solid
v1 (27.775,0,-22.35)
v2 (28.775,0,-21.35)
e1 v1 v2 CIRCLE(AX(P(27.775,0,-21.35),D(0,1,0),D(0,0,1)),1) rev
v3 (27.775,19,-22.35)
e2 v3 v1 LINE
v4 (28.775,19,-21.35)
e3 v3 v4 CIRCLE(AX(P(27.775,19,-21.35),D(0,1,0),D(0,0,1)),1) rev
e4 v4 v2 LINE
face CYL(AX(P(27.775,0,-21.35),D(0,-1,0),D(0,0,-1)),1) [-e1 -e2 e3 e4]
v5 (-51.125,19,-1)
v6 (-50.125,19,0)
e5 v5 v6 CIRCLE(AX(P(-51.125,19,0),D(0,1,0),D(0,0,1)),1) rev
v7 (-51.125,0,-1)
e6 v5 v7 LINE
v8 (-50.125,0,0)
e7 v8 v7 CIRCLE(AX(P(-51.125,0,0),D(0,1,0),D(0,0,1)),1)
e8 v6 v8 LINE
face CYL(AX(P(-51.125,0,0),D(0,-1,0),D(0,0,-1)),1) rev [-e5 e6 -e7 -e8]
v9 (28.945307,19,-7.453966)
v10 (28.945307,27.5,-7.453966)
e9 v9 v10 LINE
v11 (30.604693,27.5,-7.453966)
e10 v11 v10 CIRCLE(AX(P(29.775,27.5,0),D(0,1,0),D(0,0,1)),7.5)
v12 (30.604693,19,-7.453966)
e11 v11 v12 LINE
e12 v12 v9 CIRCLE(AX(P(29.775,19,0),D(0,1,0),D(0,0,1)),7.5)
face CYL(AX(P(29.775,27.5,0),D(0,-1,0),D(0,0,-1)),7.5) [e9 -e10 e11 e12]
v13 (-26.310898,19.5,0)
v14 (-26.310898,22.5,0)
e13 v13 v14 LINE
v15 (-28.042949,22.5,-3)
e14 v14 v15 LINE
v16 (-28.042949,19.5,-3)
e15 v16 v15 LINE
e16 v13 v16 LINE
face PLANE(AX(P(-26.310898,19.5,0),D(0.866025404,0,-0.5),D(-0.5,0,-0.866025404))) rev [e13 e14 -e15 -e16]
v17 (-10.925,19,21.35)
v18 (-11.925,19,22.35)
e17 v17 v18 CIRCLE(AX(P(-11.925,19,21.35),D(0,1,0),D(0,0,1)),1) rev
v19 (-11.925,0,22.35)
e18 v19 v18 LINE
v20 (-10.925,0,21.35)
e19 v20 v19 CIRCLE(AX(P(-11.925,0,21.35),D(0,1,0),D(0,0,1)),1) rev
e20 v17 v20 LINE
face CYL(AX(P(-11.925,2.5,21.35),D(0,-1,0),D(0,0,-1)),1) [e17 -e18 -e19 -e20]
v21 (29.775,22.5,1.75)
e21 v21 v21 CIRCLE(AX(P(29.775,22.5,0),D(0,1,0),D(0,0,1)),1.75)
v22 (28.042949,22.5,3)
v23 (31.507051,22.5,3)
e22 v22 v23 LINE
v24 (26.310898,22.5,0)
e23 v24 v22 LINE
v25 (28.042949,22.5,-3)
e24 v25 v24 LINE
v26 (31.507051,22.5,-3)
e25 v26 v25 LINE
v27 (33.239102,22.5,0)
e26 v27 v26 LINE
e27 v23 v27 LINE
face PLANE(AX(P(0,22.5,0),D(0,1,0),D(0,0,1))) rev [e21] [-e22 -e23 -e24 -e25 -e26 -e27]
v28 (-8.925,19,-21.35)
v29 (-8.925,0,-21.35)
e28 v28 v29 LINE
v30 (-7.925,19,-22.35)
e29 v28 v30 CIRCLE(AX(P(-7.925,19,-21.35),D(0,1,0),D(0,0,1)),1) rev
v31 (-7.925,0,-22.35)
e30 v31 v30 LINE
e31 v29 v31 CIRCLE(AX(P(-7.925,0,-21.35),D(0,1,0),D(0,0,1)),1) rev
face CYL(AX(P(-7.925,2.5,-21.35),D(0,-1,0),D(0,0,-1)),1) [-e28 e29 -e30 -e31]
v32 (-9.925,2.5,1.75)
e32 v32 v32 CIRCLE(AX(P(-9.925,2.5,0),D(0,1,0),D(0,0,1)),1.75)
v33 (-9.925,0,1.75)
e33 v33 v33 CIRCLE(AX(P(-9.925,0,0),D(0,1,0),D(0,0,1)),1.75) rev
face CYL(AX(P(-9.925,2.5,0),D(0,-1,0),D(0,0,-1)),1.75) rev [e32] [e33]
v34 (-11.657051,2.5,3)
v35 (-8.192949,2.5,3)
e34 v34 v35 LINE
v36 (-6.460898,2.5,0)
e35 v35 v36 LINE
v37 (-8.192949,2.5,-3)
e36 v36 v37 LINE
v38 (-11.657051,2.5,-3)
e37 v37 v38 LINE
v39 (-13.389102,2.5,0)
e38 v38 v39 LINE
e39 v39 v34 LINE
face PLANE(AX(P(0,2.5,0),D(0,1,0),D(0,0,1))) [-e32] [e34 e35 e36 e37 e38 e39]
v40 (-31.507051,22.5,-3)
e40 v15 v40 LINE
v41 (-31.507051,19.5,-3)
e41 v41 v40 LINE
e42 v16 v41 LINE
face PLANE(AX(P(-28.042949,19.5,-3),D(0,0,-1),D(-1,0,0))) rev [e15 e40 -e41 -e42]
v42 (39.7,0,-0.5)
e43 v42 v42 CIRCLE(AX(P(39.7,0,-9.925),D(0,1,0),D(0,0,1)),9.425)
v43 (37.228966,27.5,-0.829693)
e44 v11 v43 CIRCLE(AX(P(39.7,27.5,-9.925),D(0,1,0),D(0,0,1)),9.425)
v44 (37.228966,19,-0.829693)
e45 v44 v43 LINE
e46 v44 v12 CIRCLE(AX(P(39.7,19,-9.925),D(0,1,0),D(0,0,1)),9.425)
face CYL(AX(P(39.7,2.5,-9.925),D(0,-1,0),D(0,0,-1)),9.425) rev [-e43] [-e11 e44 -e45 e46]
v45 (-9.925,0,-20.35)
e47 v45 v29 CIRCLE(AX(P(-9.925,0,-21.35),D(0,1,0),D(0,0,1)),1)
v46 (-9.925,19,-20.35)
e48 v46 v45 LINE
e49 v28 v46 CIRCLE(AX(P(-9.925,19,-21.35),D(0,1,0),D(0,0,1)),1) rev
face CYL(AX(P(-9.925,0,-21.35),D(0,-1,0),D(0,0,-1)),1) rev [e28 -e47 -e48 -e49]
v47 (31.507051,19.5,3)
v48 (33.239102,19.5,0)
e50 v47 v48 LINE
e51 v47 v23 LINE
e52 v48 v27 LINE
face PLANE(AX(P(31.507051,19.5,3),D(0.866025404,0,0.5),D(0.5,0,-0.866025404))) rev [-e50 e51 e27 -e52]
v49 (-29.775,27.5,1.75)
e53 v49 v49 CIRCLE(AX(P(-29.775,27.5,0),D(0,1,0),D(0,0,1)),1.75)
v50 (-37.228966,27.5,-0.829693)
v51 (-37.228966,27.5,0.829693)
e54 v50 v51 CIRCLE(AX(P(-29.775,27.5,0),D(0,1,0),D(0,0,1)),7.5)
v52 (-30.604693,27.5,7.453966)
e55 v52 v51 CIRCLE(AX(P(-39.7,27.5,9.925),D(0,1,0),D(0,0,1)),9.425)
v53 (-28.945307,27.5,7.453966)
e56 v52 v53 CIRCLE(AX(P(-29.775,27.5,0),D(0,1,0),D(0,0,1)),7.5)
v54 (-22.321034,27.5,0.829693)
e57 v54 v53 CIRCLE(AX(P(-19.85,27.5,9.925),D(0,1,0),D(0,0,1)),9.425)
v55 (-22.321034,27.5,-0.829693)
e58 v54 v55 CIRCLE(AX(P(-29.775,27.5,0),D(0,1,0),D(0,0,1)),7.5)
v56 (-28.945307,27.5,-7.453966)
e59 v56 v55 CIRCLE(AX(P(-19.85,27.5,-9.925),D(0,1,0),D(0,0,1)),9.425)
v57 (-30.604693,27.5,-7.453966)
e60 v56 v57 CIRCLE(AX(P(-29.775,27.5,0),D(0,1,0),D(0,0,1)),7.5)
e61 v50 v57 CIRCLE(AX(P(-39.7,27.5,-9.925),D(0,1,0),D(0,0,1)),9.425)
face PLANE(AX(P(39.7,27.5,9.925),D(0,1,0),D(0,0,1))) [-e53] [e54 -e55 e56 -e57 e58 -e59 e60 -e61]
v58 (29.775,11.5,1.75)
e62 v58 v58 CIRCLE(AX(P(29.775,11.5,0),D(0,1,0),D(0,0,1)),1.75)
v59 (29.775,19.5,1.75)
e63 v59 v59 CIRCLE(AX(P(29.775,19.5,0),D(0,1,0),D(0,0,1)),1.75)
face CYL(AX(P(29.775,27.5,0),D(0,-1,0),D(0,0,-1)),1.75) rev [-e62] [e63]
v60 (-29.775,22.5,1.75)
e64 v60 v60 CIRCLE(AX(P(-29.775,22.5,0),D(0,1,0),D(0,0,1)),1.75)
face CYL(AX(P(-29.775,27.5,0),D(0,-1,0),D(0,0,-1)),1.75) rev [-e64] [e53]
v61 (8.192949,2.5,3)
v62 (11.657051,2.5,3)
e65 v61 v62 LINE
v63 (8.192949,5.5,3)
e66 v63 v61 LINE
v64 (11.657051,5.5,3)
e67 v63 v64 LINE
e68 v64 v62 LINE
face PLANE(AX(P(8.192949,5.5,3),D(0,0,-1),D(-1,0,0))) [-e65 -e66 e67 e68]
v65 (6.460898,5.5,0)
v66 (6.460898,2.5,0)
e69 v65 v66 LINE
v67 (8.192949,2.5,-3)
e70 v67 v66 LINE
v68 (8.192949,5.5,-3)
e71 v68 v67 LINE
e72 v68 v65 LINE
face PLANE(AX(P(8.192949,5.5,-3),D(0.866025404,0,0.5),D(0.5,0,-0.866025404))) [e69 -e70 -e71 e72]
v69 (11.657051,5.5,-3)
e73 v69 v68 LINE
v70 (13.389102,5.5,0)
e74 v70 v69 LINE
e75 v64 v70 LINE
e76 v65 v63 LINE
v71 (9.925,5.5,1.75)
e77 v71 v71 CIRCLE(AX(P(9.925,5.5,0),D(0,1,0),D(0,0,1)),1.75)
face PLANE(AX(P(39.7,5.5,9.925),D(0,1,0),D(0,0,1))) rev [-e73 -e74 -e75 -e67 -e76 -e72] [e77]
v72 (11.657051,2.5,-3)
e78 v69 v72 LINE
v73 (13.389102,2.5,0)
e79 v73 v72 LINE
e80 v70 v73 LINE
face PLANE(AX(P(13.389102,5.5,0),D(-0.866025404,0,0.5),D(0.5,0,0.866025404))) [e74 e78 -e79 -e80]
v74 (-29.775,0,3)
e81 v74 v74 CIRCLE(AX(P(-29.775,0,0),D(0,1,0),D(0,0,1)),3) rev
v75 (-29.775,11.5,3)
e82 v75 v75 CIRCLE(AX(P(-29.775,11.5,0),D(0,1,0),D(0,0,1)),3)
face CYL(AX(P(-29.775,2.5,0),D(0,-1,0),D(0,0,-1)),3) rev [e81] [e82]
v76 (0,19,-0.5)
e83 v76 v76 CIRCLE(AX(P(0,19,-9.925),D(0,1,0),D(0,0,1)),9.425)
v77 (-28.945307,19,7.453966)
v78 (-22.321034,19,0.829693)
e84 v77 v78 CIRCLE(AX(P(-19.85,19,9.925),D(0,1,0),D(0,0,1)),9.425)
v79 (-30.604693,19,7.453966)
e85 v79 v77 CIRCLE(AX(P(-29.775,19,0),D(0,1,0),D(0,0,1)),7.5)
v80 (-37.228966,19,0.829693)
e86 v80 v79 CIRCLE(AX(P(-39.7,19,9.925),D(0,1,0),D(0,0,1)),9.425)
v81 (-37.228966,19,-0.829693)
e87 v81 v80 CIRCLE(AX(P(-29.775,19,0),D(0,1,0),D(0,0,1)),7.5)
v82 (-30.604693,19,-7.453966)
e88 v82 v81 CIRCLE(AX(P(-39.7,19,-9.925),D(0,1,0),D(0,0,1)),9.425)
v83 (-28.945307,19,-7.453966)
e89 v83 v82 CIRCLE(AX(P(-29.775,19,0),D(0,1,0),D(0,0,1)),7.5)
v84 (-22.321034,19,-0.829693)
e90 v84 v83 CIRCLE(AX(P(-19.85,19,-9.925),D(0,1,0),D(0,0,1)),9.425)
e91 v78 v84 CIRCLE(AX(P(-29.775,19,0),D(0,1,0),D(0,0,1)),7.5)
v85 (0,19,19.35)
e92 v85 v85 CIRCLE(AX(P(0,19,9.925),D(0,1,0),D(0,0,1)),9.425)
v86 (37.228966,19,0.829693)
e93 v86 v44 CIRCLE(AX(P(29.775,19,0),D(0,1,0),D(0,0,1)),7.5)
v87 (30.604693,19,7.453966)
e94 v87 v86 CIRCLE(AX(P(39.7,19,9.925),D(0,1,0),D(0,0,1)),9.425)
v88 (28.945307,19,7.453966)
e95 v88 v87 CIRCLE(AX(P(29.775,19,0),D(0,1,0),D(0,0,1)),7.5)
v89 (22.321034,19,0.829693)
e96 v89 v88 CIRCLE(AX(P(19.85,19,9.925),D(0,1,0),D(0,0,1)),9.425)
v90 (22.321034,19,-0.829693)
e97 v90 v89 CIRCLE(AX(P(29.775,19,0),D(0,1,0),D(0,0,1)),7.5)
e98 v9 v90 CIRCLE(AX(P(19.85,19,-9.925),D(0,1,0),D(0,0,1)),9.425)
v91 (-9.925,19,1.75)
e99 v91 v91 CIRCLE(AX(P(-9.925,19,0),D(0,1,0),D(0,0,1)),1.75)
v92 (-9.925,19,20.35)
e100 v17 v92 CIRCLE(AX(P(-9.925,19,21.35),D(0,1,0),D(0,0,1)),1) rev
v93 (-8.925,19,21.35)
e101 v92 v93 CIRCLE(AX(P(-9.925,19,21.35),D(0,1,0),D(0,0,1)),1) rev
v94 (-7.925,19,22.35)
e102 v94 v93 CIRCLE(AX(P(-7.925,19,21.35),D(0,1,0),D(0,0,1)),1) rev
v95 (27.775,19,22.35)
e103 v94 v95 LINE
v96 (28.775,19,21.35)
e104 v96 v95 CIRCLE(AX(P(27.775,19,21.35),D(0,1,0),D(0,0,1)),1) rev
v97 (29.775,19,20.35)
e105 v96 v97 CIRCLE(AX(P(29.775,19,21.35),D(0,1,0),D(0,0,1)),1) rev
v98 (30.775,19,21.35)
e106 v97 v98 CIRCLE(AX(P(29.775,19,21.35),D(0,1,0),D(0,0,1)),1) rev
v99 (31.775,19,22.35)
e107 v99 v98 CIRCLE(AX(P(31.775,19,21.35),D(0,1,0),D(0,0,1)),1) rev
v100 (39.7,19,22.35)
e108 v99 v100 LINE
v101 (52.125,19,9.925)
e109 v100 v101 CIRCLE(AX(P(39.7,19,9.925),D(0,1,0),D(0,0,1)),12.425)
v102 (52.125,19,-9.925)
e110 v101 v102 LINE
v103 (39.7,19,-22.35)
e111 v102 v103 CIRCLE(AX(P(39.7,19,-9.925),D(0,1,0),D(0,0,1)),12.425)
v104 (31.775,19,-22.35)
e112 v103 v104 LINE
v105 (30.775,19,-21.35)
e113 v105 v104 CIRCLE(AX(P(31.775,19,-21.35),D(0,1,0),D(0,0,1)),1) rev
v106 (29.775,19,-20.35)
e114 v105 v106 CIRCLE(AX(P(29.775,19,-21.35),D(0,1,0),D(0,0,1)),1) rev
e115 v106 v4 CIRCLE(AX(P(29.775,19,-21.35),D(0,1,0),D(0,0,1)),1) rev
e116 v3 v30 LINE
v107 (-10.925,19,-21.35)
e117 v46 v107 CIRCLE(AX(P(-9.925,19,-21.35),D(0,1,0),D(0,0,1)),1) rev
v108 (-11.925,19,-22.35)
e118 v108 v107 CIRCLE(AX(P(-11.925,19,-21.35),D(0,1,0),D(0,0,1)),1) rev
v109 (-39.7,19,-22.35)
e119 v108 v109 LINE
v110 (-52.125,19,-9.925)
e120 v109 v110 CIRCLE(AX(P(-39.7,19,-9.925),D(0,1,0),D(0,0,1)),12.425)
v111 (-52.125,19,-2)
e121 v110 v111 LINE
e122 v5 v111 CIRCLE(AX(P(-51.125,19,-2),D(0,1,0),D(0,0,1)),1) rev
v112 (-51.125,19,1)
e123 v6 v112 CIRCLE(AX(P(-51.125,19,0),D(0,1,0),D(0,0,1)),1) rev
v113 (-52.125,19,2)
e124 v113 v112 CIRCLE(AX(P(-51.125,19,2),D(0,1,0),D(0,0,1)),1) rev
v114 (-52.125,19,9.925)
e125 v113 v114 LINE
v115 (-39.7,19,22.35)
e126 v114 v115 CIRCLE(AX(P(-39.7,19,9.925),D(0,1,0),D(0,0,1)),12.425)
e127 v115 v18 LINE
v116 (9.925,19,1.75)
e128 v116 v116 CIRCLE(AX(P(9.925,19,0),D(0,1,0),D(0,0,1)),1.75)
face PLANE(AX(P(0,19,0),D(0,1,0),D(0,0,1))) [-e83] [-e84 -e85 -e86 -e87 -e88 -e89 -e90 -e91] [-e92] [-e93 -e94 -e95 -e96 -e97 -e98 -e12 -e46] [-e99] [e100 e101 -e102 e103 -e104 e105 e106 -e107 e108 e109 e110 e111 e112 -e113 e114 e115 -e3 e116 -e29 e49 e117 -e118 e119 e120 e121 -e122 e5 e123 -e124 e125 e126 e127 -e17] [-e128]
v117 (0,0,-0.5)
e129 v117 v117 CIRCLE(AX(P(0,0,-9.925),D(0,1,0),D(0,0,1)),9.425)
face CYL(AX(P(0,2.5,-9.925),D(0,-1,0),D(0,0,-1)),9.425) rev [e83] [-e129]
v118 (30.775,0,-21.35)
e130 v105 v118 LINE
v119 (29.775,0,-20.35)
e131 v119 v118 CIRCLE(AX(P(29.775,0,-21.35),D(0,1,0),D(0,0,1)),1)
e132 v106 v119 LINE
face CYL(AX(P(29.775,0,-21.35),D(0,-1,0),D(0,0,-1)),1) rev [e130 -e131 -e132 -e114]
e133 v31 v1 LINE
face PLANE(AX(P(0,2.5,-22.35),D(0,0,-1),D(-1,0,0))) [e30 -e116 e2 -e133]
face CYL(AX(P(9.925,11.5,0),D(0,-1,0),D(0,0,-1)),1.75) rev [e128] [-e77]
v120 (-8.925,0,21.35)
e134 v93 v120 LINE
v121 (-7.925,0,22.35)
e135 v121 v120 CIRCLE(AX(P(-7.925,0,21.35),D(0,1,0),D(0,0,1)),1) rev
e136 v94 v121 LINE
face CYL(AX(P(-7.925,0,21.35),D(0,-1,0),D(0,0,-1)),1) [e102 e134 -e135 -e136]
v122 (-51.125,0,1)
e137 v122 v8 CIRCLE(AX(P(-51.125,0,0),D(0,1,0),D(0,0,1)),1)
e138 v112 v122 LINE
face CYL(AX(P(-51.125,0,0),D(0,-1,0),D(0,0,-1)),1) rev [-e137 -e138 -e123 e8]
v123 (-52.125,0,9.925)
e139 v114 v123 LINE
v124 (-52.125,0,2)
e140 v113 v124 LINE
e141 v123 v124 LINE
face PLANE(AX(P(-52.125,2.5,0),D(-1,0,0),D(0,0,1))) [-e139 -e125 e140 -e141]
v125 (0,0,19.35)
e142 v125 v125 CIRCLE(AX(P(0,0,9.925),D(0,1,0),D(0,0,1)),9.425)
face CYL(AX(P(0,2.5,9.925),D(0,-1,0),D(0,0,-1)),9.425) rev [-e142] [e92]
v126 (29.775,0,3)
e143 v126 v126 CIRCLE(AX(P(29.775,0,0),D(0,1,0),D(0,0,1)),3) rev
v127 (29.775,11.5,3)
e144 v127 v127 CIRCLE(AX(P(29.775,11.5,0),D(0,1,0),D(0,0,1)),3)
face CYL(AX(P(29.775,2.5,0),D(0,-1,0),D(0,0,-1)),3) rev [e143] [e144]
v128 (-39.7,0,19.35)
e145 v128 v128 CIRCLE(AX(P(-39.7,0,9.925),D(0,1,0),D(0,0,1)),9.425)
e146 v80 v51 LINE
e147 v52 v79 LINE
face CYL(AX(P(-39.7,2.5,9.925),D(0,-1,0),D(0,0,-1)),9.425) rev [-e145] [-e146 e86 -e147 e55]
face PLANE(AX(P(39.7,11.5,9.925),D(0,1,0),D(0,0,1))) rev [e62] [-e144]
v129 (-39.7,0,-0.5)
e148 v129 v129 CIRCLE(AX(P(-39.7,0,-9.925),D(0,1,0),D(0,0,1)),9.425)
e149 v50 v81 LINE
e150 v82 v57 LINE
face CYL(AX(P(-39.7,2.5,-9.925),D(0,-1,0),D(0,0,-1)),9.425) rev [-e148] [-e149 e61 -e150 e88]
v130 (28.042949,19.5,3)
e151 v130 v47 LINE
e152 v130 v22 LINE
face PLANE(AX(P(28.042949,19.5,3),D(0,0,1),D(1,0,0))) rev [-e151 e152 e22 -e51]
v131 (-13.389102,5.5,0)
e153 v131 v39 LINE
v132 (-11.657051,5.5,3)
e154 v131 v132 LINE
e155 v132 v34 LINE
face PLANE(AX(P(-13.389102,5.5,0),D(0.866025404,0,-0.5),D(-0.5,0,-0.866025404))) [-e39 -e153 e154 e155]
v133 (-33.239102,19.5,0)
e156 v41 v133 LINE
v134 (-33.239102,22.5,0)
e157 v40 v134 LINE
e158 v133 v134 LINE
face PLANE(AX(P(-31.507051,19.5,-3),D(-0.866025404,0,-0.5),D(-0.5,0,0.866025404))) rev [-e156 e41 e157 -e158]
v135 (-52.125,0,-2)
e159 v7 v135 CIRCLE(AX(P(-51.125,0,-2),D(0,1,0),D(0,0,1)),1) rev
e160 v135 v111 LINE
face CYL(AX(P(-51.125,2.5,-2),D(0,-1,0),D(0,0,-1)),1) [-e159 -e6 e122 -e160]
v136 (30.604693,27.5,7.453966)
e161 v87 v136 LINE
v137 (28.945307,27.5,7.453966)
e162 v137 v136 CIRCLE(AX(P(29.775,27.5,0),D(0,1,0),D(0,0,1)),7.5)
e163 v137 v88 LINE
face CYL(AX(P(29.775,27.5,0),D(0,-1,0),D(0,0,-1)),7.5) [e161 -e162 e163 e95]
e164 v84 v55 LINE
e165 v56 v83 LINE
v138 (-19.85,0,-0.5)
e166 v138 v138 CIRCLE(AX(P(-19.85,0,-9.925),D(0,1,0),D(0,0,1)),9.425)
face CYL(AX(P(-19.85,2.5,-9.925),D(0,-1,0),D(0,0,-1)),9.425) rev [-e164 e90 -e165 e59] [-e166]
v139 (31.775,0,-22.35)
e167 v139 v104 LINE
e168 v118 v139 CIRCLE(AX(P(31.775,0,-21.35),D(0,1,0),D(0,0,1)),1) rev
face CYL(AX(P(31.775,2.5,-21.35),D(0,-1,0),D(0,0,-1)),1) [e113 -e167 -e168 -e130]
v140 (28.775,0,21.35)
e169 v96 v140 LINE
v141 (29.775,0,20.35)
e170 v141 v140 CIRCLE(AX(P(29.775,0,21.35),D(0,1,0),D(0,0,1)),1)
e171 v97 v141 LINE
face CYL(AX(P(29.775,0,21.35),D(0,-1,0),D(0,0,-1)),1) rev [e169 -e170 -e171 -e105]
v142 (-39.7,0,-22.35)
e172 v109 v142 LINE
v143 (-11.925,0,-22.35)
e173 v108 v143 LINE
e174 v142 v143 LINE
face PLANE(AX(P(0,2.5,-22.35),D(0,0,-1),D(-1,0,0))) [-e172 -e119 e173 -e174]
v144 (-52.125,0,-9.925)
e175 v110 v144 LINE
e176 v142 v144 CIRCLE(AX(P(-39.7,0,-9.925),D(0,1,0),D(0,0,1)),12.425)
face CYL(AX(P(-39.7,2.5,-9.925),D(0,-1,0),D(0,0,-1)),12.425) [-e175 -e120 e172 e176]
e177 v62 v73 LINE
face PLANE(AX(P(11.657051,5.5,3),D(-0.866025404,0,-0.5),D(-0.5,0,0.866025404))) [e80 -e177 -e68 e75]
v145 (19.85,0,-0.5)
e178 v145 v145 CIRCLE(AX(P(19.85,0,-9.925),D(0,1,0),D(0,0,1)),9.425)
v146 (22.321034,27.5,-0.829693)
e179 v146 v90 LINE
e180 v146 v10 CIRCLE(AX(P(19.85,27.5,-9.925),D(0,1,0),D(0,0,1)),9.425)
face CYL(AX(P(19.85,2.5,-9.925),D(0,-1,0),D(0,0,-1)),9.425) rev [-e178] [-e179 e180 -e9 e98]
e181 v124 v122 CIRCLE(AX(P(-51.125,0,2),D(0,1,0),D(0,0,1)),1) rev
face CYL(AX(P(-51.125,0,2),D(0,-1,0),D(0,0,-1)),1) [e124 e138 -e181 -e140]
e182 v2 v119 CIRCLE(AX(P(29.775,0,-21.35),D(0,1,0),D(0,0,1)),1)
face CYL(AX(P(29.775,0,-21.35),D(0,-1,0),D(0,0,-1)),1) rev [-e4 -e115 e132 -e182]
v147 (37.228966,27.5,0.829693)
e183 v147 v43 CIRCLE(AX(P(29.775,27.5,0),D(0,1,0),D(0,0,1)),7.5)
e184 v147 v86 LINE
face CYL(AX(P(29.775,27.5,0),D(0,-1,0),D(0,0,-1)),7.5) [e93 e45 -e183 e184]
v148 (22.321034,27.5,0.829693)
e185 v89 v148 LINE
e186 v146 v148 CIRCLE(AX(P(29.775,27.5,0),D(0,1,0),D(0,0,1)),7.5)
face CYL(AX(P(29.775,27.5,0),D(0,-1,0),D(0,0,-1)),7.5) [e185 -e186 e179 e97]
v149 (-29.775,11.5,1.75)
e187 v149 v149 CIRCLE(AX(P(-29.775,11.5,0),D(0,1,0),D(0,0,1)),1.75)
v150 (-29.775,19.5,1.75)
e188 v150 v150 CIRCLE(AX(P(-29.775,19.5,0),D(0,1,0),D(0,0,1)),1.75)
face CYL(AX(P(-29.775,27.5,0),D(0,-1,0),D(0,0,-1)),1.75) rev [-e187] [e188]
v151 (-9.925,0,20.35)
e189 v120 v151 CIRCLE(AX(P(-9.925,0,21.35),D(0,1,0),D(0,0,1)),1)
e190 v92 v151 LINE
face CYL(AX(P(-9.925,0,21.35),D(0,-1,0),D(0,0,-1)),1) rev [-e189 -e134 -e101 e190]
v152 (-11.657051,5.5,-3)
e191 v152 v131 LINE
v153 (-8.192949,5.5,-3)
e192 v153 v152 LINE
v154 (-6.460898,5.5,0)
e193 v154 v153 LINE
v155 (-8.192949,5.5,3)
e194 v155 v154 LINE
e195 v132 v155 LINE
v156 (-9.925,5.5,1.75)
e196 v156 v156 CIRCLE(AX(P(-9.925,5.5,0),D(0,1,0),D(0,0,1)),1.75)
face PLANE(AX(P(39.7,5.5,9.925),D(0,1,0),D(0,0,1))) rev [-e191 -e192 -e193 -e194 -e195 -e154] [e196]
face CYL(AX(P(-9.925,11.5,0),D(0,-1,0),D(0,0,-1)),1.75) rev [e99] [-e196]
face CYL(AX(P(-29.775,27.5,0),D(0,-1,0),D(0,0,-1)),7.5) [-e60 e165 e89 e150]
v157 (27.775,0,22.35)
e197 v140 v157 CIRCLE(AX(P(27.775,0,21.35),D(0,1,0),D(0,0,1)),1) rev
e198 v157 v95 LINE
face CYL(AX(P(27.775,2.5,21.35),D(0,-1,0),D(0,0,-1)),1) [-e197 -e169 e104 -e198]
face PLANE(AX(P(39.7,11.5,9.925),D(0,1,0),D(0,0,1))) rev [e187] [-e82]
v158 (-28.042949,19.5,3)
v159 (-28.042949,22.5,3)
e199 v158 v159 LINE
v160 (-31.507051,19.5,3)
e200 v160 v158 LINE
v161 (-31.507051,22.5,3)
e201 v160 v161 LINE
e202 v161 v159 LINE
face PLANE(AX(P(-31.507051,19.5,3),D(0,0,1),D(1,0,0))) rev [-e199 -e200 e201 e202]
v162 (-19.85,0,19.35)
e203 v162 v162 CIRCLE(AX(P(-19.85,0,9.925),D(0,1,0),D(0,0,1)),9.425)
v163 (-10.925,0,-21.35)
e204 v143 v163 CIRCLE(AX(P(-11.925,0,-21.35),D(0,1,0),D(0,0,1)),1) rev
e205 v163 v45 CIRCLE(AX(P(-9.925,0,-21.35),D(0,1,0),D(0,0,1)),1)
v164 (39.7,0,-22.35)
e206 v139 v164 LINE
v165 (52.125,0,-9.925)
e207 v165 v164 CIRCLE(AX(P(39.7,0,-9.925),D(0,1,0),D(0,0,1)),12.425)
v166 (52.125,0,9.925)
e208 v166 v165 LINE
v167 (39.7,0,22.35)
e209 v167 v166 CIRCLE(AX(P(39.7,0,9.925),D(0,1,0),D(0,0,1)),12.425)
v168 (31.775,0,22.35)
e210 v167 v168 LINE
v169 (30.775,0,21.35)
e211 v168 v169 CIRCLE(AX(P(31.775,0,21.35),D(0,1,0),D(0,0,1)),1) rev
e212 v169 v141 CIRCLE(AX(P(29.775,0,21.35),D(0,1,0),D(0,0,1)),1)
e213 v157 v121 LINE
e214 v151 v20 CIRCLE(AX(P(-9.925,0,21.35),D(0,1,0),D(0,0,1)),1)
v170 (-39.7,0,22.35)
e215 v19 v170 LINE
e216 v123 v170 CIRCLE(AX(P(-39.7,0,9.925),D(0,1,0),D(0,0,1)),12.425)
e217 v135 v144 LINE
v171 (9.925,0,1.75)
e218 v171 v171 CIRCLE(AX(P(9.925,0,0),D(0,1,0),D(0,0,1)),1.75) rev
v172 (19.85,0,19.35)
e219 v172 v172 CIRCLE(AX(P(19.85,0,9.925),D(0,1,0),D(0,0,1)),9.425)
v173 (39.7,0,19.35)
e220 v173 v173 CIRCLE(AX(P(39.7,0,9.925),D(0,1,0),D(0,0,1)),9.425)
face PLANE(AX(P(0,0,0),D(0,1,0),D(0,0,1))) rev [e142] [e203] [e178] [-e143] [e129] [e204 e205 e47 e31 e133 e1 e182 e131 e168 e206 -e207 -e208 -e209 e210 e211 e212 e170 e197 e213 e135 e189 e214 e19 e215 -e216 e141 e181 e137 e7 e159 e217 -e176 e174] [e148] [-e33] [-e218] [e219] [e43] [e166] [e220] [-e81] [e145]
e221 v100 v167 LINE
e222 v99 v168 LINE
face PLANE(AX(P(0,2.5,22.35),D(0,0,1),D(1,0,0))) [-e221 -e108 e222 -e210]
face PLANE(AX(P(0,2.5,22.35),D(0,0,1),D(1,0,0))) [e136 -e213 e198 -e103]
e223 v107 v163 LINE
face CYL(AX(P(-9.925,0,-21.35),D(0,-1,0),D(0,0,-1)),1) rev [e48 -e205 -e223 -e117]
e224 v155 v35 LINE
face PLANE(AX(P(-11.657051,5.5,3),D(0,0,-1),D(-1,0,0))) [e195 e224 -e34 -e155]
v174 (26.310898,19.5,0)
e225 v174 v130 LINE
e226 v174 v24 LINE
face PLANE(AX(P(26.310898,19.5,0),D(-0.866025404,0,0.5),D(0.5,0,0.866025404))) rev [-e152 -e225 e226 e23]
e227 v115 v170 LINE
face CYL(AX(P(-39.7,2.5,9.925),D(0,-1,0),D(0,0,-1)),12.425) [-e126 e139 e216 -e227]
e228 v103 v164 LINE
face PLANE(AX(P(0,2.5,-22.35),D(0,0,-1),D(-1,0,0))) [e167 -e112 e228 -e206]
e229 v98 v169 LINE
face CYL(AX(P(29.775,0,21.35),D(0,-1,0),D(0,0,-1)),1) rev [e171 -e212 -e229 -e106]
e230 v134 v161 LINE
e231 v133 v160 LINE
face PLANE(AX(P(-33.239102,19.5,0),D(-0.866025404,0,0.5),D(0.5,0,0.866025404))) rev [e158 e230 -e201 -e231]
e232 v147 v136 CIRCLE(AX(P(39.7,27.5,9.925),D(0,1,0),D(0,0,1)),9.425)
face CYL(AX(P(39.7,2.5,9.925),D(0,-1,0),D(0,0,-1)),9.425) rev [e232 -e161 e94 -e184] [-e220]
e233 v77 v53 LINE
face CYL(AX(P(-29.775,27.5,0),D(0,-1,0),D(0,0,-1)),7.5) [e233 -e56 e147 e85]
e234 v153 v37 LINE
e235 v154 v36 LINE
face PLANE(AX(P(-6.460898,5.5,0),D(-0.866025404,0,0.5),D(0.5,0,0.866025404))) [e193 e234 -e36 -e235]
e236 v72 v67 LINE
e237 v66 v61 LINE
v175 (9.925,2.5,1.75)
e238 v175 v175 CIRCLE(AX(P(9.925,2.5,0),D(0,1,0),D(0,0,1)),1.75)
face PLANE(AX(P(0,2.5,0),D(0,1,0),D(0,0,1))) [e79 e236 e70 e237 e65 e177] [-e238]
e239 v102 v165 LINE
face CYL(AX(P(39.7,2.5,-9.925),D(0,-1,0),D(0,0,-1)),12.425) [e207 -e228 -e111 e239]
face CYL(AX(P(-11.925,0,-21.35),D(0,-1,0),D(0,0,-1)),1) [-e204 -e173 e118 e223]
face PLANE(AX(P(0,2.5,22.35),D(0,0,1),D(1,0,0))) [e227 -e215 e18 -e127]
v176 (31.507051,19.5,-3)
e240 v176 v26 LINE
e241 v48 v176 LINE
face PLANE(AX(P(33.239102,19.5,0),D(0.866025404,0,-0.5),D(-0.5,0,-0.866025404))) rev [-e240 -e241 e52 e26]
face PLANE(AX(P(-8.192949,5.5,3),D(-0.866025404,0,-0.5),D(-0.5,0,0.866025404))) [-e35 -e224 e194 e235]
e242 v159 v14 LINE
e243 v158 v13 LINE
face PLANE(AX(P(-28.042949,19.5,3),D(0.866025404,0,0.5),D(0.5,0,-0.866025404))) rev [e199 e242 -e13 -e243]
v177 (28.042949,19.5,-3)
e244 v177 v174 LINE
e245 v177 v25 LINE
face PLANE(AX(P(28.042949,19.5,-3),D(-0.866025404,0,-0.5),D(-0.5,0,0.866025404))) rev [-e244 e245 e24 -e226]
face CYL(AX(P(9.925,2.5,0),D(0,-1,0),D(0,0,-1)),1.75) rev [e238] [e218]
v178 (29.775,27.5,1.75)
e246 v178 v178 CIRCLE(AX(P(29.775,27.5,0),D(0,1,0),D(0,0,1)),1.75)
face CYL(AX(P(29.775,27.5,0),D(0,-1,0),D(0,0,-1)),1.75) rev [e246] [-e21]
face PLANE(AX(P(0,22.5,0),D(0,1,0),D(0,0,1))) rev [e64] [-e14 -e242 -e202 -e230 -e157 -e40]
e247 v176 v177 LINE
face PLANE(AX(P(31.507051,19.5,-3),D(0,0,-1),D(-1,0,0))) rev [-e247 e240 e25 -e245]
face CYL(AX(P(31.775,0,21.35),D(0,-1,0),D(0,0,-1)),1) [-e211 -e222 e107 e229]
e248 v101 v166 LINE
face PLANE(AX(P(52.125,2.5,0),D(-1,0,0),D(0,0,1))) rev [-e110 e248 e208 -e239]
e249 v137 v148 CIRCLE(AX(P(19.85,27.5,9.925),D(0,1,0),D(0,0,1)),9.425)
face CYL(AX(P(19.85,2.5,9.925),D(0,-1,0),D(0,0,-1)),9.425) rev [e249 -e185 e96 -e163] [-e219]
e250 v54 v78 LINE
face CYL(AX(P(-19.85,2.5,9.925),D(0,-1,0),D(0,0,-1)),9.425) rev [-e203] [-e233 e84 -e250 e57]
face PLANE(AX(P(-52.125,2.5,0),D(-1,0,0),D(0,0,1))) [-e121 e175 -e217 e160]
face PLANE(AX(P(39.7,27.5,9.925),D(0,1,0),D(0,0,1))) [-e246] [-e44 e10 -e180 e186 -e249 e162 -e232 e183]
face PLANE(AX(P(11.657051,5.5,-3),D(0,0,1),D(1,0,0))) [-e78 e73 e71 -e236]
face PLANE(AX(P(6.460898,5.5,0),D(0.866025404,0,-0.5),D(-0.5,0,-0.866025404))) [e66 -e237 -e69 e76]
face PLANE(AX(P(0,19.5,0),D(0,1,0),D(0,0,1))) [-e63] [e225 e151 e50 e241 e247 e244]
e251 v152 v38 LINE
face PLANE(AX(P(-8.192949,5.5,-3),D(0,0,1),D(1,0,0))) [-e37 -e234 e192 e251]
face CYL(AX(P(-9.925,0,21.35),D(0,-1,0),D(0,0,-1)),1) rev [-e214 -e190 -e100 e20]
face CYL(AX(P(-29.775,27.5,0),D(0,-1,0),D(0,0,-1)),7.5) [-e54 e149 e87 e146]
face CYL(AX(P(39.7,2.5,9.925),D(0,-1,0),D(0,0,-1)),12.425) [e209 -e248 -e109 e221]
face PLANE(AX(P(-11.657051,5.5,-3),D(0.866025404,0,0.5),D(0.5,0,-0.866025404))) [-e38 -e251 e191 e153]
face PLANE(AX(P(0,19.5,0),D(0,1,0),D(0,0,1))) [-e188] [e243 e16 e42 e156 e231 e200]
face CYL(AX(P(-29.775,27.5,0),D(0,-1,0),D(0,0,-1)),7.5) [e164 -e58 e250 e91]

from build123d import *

# Parameters (mm, degrees)
SKETCH2_R               = 9.425
BOSS_EXTRUDE1_DEPTH     = 2.5
CUT_EXTRUDE3_DEPTH      = 57.769605644
CUT_EXTRUDE3_DEPTH_BACK = 57.769605644
SKETCH7_R               = 3
SKETCH7_R_2             = 1.75
SKETCH9_R               = 9.425
SKETCH9_R_2             = 3
BOSS_EXTRUDE2_DEPTH     = 3
SKETCH11_R              = 9.425
SKETCH11_R_2            = 3
SKETCH11_R_3            = 1.75
BOSS_EXTRUDE3_DEPTH     = 6
SKETCH12_R              = 9.425
SKETCH12_R_2            = 1.75
BOSS_EXTRUDE4_DEPTH     = 16
CUT_EXTRUDE4_DEPTH      = 3
SKETCH14_W              = 2
SKETCH14_H              = 2
CUT_EXTRUDE5_DEPTH      = 64.030057314
FILLET1_R               = 1
SKETCH15_W              = 104.25
SKETCH15_H              = 44.7
SKETCH15_R              = 7.5
CUT_EXTRUDE6_DEPTH      = 60.812524817


with BuildPart() as part:
    # Sketch2 → Boss-Extrude1 (new body)
    with BuildSketch(Plane(origin=(0, 0, 0), x_dir=(1, 0, 0), z_dir=(0, 1, 0))):
        with BuildLine():
            Line((-39.7, -22.35), (39.7, -22.35))
            ThreePointArc((39.7, -22.35), (48.485801756, -18.710801756), (52.125, -9.925))
            Line((52.125, -9.925), (52.125, 9.925))
            ThreePointArc((52.125, 9.925), (48.485801756, 18.710801756), (39.7, 22.35))
            Line((39.7, 22.35), (-39.7, 22.35))
            ThreePointArc((-39.7, 22.35), (-48.485801756, 18.710801756), (-52.125, 9.925))
            Line((-52.125, 9.925), (-52.125, -9.925))
            ThreePointArc((-52.125, -9.925), (-48.485801756, -18.710801756), (-39.7, -22.35))
        make_face()
        with Locations(Location((-19.85, 9.925, 0), (0, 0, 270))):
            Circle(SKETCH2_R, mode=Mode.SUBTRACT)
        with Locations(Location((-39.7, -9.925, 0), (0, 0, 270))):
            Circle(SKETCH2_R, mode=Mode.SUBTRACT)
        with Locations(Location((-39.7, 9.925, 0), (0, 0, 270))):
            Circle(SKETCH2_R, mode=Mode.SUBTRACT)
        with Locations(Location((-19.85, -9.925, 0), (0, 0, 270))):
            Circle(SKETCH2_R, mode=Mode.SUBTRACT)
        with Locations(Location((19.85, -9.925, 0), (0, 0, 270))):
            Circle(SKETCH2_R, mode=Mode.SUBTRACT)
        with Locations(Location((39.7, 9.925, 0), (0, 0, 270))):
            Circle(SKETCH2_R, mode=Mode.SUBTRACT)
        with Locations(Location((39.7, -9.925, 0), (0, 0, 270))):
            Circle(SKETCH2_R, mode=Mode.SUBTRACT)
        with Locations(Location((19.85, 9.925, 0), (0, 0, 270))):
            Circle(SKETCH2_R, mode=Mode.SUBTRACT)
        with Locations(Location((0, -9.925, 0), (0, 0, 270))):
            Circle(SKETCH2_R, mode=Mode.SUBTRACT)
        with Locations(Location((0, 9.925, 0), (0, 0, 270))):
            Circle(SKETCH2_R, mode=Mode.SUBTRACT)
    extrude(amount=BOSS_EXTRUDE1_DEPTH)

    # Sketch7 → Cut-Extrude3 (cut, two sides: drawn at the far end of the back side and taken through both)
    with BuildSketch(Plane(origin=(0, 0, 0), x_dir=(1, 0, 0), z_dir=(0, 1, 0)).offset(-CUT_EXTRUDE3_DEPTH_BACK)):
        with Locations(Location((-29.775, 0, 0), (0, 0, 270))):
            Circle(SKETCH7_R)
        with Locations(Location((-9.925, 0, 0), (0, 0, 270))):
            Circle(SKETCH7_R_2)
        with Locations(Location((9.925, 0, 0), (0, 0, 270))):
            Circle(SKETCH7_R_2)
        with Locations(Location((29.775, 0, 0), (0, 0, 270))):
            Circle(SKETCH7_R)
    extrude(amount=CUT_EXTRUDE3_DEPTH + CUT_EXTRUDE3_DEPTH_BACK, mode=Mode.SUBTRACT)

    # Sketch9 → Boss-Extrude2 (add)
    with BuildSketch(Plane(origin=(0, 2.5, 0), x_dir=(1, 0, 0), z_dir=(0, 1, 0))):
        with BuildLine():
            Line((39.7, -22.35), (-39.7, -22.35))
            ThreePointArc((-39.7, -22.35), (-48.485801756, -18.710801756), (-52.125, -9.925))
            Line((-52.125, -9.925), (-52.125, 9.925))
            ThreePointArc((-52.125, 9.925), (-48.485801756, 18.710801756), (-39.7, 22.35))
            Line((-39.7, 22.35), (39.7, 22.35))
            ThreePointArc((39.7, 22.35), (48.485801756, 18.710801756), (52.125, 9.925))
            Line((52.125, 9.925), (52.125, -9.925))
            ThreePointArc((52.125, -9.925), (48.485801756, -18.710801756), (39.7, -22.35))
        make_face()
        with Locations(Location((39.7, -9.925, 0), (0, 0, 270))):
            Circle(SKETCH9_R, mode=Mode.SUBTRACT)
        with Locations(Location((19.85, -9.925, 0), (0, 0, 270))):
            Circle(SKETCH9_R, mode=Mode.SUBTRACT)
        with Locations(Location((0, -9.925, 0), (0, 0, 270))):
            Circle(SKETCH9_R, mode=Mode.SUBTRACT)
        with Locations(Location((-19.85, -9.925, 0), (0, 0, 270))):
            Circle(SKETCH9_R, mode=Mode.SUBTRACT)
        with Locations(Location((-39.7, -9.925, 0), (0, 0, 270))):
            Circle(SKETCH9_R, mode=Mode.SUBTRACT)
        with Locations(Location((-39.7, 9.925, 0), (0, 0, 270))):
            Circle(SKETCH9_R, mode=Mode.SUBTRACT)
        with Locations(Location((-19.85, 9.925, 0), (0, 0, 270))):
            Circle(SKETCH9_R, mode=Mode.SUBTRACT)
        with Locations(Location((0, 9.925, 0), (0, 0, 270))):
            Circle(SKETCH9_R, mode=Mode.SUBTRACT)
        with Locations(Location((19.85, 9.925, 0), (0, 0, 270))):
            Circle(SKETCH9_R, mode=Mode.SUBTRACT)
        with Locations(Location((39.7, 9.925, 0), (0, 0, 270))):
            Circle(SKETCH9_R, mode=Mode.SUBTRACT)
        with Locations(Location((29.775, 0, 0), (0, 0, 270))):
            Circle(SKETCH9_R_2, mode=Mode.SUBTRACT)
        with Locations(Location((-29.775, 0, 0), (0, 0, 270))):
            Circle(SKETCH9_R_2, mode=Mode.SUBTRACT)
        Polygon((6.460898385, 0), (8.192949192, -3), (11.657050808, -3), (13.389101615, 0), (11.657050808, 3), (8.192949192, 3), align=None, mode=Mode.SUBTRACT)
        Polygon((-6.460898385, 0), (-8.192949192, 3), (-11.657050808, 3), (-13.389101615, 0), (-11.657050808, -3), (-8.192949192, -3), align=None, mode=Mode.SUBTRACT)
    extrude(amount=BOSS_EXTRUDE2_DEPTH)

    # Sketch11 → Boss-Extrude3 (add)
    with BuildSketch(Plane(origin=(0, 5.5, 0), x_dir=(1, 0, 0), z_dir=(0, 1, 0))):
        with BuildLine():
            Line((39.7, -22.35), (-39.7, -22.35))
            ThreePointArc((-39.7, -22.35), (-48.485801756, -18.710801756), (-52.125, -9.925))
            Line((-52.125, -9.925), (-52.125, 9.925))
            ThreePointArc((-52.125, 9.925), (-48.485801756, 18.710801756), (-39.7, 22.35))
            Line((-39.7, 22.35), (39.7, 22.35))
            ThreePointArc((39.7, 22.35), (48.485801756, 18.710801756), (52.125, 9.925))
            Line((52.125, 9.925), (52.125, -9.925))
            ThreePointArc((52.125, -9.925), (48.485801756, -18.710801756), (39.7, -22.35))
        make_face()
        with Locations(Location((39.7, -9.925, 0), (0, 0, 270))):
            Circle(SKETCH11_R, mode=Mode.SUBTRACT)
        with Locations(Location((19.85, -9.925, 0), (0, 0, 270))):
            Circle(SKETCH11_R, mode=Mode.SUBTRACT)
        with Locations(Location((0, -9.925, 0), (0, 0, 270))):
            Circle(SKETCH11_R, mode=Mode.SUBTRACT)
        with Locations(Location((-19.85, -9.925, 0), (0, 0, 270))):
            Circle(SKETCH11_R, mode=Mode.SUBTRACT)
        with Locations(Location((-39.7, -9.925, 0), (0, 0, 270))):
            Circle(SKETCH11_R, mode=Mode.SUBTRACT)
        with Locations(Location((-39.7, 9.925, 0), (0, 0, 270))):
            Circle(SKETCH11_R, mode=Mode.SUBTRACT)
        with Locations(Location((-19.85, 9.925, 0), (0, 0, 270))):
            Circle(SKETCH11_R, mode=Mode.SUBTRACT)
        with Locations(Location((0, 9.925, 0), (0, 0, 270))):
            Circle(SKETCH11_R, mode=Mode.SUBTRACT)
        with Locations(Location((19.85, 9.925, 0), (0, 0, 270))):
            Circle(SKETCH11_R, mode=Mode.SUBTRACT)
        with Locations(Location((39.7, 9.925, 0), (0, 0, 270))):
            Circle(SKETCH11_R, mode=Mode.SUBTRACT)
        with Locations(Location((29.775, 0, 0), (0, 0, 270))):
            Circle(SKETCH11_R_2, mode=Mode.SUBTRACT)
        with Locations(Location((-29.775, 0, 0), (0, 0, 270))):
            Circle(SKETCH11_R_2, mode=Mode.SUBTRACT)
        with Locations(Location((-9.925, 0, 0), (0, 0, 270))):
            Circle(SKETCH11_R_3, mode=Mode.SUBTRACT)
        with Locations(Location((9.925, 0, 0), (0, 0, 270))):
            Circle(SKETCH11_R_3, mode=Mode.SUBTRACT)
    extrude(amount=BOSS_EXTRUDE3_DEPTH)

    # Sketch12 → Boss-Extrude4 (add)
    with BuildSketch(Plane(origin=(0, 11.5, 0), x_dir=(1, 0, 0), z_dir=(0, 1, 0))):
        with BuildLine():
            Line((39.7, -22.35), (-39.7, -22.35))
            ThreePointArc((-39.7, -22.35), (-48.485801756, -18.710801756), (-52.125, -9.925))
            Line((-52.125, -9.925), (-52.125, 9.925))
            ThreePointArc((-52.125, 9.925), (-48.485801756, 18.710801756), (-39.7, 22.35))
            Line((-39.7, 22.35), (39.7, 22.35))
            ThreePointArc((39.7, 22.35), (48.485801756, 18.710801756), (52.125, 9.925))
            Line((52.125, 9.925), (52.125, -9.925))
            ThreePointArc((52.125, -9.925), (48.485801756, -18.710801756), (39.7, -22.35))
        make_face()
        with Locations(Location((39.7, -9.925, 0), (0, 0, 270))):
            Circle(SKETCH12_R, mode=Mode.SUBTRACT)
        with Locations(Location((19.85, -9.925, 0), (0, 0, 270))):
            Circle(SKETCH12_R, mode=Mode.SUBTRACT)
        with Locations(Location((0, -9.925, 0), (0, 0, 270))):
            Circle(SKETCH12_R, mode=Mode.SUBTRACT)
        with Locations(Location((-19.85, -9.925, 0), (0, 0, 270))):
            Circle(SKETCH12_R, mode=Mode.SUBTRACT)
        with Locations(Location((-39.7, -9.925, 0), (0, 0, 270))):
            Circle(SKETCH12_R, mode=Mode.SUBTRACT)
        with Locations(Location((-39.7, 9.925, 0), (0, 0, 270))):
            Circle(SKETCH12_R, mode=Mode.SUBTRACT)
        with Locations(Location((-19.85, 9.925, 0), (0, 0, 270))):
            Circle(SKETCH12_R, mode=Mode.SUBTRACT)
        with Locations(Location((0, 9.925, 0), (0, 0, 270))):
            Circle(SKETCH12_R, mode=Mode.SUBTRACT)
        with Locations(Location((19.85, 9.925, 0), (0, 0, 270))):
            Circle(SKETCH12_R, mode=Mode.SUBTRACT)
        with Locations(Location((39.7, 9.925, 0), (0, 0, 270))):
            Circle(SKETCH12_R, mode=Mode.SUBTRACT)
        with Locations(Location((29.775, 0, 0), (0, 0, 270))):
            Circle(SKETCH12_R_2, mode=Mode.SUBTRACT)
        with Locations(Location((9.925, 0, 0), (0, 0, 270))):
            Circle(SKETCH12_R_2, mode=Mode.SUBTRACT)
        with Locations(Location((-9.925, 0, 0), (0, 0, 270))):
            Circle(SKETCH12_R_2, mode=Mode.SUBTRACT)
        with Locations(Location((-29.775, 0, 0), (0, 0, 270))):
            Circle(SKETCH12_R_2, mode=Mode.SUBTRACT)
    extrude(amount=BOSS_EXTRUDE4_DEPTH)

    # Sketch13 → Cut-Extrude4 (cut)
    with BuildSketch(Plane(origin=(0, 22.5, 0), x_dir=(1, 0, 0), z_dir=(0, 1, 0))):
        Polygon((-28.042949192, -3), (-26.310898385, 0), (-28.042949192, 3), (-31.507050808, 3), (-33.239101615, 0), (-31.507050808, -3), align=None)
        Polygon((28.042949192, -3), (31.507050808, -3), (33.239101615, 0), (31.507050808, 3), (28.042949192, 3), (26.310898385, 0), align=None)
    extrude(amount=-CUT_EXTRUDE4_DEPTH, mode=Mode.SUBTRACT)

    # Sketch14 → Cut-Extrude5 (cut, through all)
    with BuildSketch(Plane(origin=(0, 27.5, 0), x_dir=(1, 0, 0), z_dir=(0, 1, 0))):
        with Locations((-51.125, 0)):
            Rectangle(SKETCH14_W, SKETCH14_H)
        with Locations((29.775, -21.35)):
            Rectangle(SKETCH14_W, SKETCH14_H)
        with Locations((-9.925, -21.35)):
            Rectangle(SKETCH14_W, SKETCH14_H)
        with Locations((-9.925, 21.35)):
            Rectangle(SKETCH14_W, SKETCH14_H)
        with Locations((29.775, 21.35)):
            Rectangle(SKETCH14_W, SKETCH14_H)
    extrude(amount=-CUT_EXTRUDE5_DEPTH, mode=Mode.SUBTRACT)

    # Fillet1
    fillet1_edges = [part.edges().sort_by_distance(p)[0] for p in [
        (28.775, 13.75, -20.35),
        (30.775, 13.75, -20.35),
        (-10.925, 13.75, -20.35),
        (-8.925, 13.75, -20.35),
        (-50.125, 13.75, 1),
        (-50.125, 13.75, -1),
        (30.775, 13.75, 20.35),
        (28.775, 13.75, 20.35),
        (-8.925, 13.75, 20.35),
        (-10.925, 13.75, 20.35),
    ]]
    fillet(fillet1_edges, radius=FILLET1_R - 0.0001)  # a hair under: the kernel refuses the full size
    fillet1_2_edges = [part.edges().sort_by_distance(p)[0] for p in [
        (28.775, 27.5, -21.84995),
        (30.775, 27.5, -21.84995),
        (-10.925, 27.5, -21.84995),
        (-8.925, 27.5, -21.84995),
        (-51.62495, 27.5, 1),
        (-51.62495, 27.5, -1),
        (30.775, 27.5, 21.84995),
        (28.775, 27.5, 21.84995),
        (-8.925, 27.5, 21.84995),
        (-10.925, 27.5, 21.84995),
        (30.775, 13.75, -22.35),
        (28.775, 13.75, -22.35),
        (-8.925, 13.75, -22.35),
        (-10.925, 13.75, -22.35),
        (-52.125, 13.75, 1),
        (-52.125, 13.75, -1),
        (30.775, 13.75, 22.35),
        (28.775, 13.75, 22.35),
        (-8.925, 13.75, 22.35),
        (-10.925, 13.75, 22.35),
        (-10.632136071, 27.5, 20.642863929),
        (-9.217863929, 27.5, 20.642863929),
        (29.067863929, 27.5, 20.642863929),
        (30.482136071, 27.5, 20.642863929),
        (-50.417863929, 27.5, -0.707136071),
        (-50.417863929, 27.5, 0.707136071),
        (-9.217863929, 27.5, -20.642863929),
        (-10.632136071, 27.5, -20.642863929),
        (30.482136071, 27.5, -20.642863929),
        (29.067863929, 27.5, -20.642863929),
    ]]
    fillet(fillet1_2_edges, radius=FILLET1_R - 0.0001)  # a hair under: the kernel refuses the full size

    # Sketch15 → Cut-Extrude6 (cut, through all)
    with BuildSketch(Plane(origin=(0, 19, 0), x_dir=(1, 0, 0), z_dir=(0, 1, 0))):
        Rectangle(SKETCH15_W, SKETCH15_H)
        with Locations((-29.775, 0)):
            Circle(SKETCH15_R, mode=Mode.SUBTRACT)
        with Locations((29.775, 0)):
            Circle(SKETCH15_R, mode=Mode.SUBTRACT)
    extrude(amount=CUT_EXTRUDE6_DEPTH, mode=Mode.SUBTRACT)


solid = part.part
